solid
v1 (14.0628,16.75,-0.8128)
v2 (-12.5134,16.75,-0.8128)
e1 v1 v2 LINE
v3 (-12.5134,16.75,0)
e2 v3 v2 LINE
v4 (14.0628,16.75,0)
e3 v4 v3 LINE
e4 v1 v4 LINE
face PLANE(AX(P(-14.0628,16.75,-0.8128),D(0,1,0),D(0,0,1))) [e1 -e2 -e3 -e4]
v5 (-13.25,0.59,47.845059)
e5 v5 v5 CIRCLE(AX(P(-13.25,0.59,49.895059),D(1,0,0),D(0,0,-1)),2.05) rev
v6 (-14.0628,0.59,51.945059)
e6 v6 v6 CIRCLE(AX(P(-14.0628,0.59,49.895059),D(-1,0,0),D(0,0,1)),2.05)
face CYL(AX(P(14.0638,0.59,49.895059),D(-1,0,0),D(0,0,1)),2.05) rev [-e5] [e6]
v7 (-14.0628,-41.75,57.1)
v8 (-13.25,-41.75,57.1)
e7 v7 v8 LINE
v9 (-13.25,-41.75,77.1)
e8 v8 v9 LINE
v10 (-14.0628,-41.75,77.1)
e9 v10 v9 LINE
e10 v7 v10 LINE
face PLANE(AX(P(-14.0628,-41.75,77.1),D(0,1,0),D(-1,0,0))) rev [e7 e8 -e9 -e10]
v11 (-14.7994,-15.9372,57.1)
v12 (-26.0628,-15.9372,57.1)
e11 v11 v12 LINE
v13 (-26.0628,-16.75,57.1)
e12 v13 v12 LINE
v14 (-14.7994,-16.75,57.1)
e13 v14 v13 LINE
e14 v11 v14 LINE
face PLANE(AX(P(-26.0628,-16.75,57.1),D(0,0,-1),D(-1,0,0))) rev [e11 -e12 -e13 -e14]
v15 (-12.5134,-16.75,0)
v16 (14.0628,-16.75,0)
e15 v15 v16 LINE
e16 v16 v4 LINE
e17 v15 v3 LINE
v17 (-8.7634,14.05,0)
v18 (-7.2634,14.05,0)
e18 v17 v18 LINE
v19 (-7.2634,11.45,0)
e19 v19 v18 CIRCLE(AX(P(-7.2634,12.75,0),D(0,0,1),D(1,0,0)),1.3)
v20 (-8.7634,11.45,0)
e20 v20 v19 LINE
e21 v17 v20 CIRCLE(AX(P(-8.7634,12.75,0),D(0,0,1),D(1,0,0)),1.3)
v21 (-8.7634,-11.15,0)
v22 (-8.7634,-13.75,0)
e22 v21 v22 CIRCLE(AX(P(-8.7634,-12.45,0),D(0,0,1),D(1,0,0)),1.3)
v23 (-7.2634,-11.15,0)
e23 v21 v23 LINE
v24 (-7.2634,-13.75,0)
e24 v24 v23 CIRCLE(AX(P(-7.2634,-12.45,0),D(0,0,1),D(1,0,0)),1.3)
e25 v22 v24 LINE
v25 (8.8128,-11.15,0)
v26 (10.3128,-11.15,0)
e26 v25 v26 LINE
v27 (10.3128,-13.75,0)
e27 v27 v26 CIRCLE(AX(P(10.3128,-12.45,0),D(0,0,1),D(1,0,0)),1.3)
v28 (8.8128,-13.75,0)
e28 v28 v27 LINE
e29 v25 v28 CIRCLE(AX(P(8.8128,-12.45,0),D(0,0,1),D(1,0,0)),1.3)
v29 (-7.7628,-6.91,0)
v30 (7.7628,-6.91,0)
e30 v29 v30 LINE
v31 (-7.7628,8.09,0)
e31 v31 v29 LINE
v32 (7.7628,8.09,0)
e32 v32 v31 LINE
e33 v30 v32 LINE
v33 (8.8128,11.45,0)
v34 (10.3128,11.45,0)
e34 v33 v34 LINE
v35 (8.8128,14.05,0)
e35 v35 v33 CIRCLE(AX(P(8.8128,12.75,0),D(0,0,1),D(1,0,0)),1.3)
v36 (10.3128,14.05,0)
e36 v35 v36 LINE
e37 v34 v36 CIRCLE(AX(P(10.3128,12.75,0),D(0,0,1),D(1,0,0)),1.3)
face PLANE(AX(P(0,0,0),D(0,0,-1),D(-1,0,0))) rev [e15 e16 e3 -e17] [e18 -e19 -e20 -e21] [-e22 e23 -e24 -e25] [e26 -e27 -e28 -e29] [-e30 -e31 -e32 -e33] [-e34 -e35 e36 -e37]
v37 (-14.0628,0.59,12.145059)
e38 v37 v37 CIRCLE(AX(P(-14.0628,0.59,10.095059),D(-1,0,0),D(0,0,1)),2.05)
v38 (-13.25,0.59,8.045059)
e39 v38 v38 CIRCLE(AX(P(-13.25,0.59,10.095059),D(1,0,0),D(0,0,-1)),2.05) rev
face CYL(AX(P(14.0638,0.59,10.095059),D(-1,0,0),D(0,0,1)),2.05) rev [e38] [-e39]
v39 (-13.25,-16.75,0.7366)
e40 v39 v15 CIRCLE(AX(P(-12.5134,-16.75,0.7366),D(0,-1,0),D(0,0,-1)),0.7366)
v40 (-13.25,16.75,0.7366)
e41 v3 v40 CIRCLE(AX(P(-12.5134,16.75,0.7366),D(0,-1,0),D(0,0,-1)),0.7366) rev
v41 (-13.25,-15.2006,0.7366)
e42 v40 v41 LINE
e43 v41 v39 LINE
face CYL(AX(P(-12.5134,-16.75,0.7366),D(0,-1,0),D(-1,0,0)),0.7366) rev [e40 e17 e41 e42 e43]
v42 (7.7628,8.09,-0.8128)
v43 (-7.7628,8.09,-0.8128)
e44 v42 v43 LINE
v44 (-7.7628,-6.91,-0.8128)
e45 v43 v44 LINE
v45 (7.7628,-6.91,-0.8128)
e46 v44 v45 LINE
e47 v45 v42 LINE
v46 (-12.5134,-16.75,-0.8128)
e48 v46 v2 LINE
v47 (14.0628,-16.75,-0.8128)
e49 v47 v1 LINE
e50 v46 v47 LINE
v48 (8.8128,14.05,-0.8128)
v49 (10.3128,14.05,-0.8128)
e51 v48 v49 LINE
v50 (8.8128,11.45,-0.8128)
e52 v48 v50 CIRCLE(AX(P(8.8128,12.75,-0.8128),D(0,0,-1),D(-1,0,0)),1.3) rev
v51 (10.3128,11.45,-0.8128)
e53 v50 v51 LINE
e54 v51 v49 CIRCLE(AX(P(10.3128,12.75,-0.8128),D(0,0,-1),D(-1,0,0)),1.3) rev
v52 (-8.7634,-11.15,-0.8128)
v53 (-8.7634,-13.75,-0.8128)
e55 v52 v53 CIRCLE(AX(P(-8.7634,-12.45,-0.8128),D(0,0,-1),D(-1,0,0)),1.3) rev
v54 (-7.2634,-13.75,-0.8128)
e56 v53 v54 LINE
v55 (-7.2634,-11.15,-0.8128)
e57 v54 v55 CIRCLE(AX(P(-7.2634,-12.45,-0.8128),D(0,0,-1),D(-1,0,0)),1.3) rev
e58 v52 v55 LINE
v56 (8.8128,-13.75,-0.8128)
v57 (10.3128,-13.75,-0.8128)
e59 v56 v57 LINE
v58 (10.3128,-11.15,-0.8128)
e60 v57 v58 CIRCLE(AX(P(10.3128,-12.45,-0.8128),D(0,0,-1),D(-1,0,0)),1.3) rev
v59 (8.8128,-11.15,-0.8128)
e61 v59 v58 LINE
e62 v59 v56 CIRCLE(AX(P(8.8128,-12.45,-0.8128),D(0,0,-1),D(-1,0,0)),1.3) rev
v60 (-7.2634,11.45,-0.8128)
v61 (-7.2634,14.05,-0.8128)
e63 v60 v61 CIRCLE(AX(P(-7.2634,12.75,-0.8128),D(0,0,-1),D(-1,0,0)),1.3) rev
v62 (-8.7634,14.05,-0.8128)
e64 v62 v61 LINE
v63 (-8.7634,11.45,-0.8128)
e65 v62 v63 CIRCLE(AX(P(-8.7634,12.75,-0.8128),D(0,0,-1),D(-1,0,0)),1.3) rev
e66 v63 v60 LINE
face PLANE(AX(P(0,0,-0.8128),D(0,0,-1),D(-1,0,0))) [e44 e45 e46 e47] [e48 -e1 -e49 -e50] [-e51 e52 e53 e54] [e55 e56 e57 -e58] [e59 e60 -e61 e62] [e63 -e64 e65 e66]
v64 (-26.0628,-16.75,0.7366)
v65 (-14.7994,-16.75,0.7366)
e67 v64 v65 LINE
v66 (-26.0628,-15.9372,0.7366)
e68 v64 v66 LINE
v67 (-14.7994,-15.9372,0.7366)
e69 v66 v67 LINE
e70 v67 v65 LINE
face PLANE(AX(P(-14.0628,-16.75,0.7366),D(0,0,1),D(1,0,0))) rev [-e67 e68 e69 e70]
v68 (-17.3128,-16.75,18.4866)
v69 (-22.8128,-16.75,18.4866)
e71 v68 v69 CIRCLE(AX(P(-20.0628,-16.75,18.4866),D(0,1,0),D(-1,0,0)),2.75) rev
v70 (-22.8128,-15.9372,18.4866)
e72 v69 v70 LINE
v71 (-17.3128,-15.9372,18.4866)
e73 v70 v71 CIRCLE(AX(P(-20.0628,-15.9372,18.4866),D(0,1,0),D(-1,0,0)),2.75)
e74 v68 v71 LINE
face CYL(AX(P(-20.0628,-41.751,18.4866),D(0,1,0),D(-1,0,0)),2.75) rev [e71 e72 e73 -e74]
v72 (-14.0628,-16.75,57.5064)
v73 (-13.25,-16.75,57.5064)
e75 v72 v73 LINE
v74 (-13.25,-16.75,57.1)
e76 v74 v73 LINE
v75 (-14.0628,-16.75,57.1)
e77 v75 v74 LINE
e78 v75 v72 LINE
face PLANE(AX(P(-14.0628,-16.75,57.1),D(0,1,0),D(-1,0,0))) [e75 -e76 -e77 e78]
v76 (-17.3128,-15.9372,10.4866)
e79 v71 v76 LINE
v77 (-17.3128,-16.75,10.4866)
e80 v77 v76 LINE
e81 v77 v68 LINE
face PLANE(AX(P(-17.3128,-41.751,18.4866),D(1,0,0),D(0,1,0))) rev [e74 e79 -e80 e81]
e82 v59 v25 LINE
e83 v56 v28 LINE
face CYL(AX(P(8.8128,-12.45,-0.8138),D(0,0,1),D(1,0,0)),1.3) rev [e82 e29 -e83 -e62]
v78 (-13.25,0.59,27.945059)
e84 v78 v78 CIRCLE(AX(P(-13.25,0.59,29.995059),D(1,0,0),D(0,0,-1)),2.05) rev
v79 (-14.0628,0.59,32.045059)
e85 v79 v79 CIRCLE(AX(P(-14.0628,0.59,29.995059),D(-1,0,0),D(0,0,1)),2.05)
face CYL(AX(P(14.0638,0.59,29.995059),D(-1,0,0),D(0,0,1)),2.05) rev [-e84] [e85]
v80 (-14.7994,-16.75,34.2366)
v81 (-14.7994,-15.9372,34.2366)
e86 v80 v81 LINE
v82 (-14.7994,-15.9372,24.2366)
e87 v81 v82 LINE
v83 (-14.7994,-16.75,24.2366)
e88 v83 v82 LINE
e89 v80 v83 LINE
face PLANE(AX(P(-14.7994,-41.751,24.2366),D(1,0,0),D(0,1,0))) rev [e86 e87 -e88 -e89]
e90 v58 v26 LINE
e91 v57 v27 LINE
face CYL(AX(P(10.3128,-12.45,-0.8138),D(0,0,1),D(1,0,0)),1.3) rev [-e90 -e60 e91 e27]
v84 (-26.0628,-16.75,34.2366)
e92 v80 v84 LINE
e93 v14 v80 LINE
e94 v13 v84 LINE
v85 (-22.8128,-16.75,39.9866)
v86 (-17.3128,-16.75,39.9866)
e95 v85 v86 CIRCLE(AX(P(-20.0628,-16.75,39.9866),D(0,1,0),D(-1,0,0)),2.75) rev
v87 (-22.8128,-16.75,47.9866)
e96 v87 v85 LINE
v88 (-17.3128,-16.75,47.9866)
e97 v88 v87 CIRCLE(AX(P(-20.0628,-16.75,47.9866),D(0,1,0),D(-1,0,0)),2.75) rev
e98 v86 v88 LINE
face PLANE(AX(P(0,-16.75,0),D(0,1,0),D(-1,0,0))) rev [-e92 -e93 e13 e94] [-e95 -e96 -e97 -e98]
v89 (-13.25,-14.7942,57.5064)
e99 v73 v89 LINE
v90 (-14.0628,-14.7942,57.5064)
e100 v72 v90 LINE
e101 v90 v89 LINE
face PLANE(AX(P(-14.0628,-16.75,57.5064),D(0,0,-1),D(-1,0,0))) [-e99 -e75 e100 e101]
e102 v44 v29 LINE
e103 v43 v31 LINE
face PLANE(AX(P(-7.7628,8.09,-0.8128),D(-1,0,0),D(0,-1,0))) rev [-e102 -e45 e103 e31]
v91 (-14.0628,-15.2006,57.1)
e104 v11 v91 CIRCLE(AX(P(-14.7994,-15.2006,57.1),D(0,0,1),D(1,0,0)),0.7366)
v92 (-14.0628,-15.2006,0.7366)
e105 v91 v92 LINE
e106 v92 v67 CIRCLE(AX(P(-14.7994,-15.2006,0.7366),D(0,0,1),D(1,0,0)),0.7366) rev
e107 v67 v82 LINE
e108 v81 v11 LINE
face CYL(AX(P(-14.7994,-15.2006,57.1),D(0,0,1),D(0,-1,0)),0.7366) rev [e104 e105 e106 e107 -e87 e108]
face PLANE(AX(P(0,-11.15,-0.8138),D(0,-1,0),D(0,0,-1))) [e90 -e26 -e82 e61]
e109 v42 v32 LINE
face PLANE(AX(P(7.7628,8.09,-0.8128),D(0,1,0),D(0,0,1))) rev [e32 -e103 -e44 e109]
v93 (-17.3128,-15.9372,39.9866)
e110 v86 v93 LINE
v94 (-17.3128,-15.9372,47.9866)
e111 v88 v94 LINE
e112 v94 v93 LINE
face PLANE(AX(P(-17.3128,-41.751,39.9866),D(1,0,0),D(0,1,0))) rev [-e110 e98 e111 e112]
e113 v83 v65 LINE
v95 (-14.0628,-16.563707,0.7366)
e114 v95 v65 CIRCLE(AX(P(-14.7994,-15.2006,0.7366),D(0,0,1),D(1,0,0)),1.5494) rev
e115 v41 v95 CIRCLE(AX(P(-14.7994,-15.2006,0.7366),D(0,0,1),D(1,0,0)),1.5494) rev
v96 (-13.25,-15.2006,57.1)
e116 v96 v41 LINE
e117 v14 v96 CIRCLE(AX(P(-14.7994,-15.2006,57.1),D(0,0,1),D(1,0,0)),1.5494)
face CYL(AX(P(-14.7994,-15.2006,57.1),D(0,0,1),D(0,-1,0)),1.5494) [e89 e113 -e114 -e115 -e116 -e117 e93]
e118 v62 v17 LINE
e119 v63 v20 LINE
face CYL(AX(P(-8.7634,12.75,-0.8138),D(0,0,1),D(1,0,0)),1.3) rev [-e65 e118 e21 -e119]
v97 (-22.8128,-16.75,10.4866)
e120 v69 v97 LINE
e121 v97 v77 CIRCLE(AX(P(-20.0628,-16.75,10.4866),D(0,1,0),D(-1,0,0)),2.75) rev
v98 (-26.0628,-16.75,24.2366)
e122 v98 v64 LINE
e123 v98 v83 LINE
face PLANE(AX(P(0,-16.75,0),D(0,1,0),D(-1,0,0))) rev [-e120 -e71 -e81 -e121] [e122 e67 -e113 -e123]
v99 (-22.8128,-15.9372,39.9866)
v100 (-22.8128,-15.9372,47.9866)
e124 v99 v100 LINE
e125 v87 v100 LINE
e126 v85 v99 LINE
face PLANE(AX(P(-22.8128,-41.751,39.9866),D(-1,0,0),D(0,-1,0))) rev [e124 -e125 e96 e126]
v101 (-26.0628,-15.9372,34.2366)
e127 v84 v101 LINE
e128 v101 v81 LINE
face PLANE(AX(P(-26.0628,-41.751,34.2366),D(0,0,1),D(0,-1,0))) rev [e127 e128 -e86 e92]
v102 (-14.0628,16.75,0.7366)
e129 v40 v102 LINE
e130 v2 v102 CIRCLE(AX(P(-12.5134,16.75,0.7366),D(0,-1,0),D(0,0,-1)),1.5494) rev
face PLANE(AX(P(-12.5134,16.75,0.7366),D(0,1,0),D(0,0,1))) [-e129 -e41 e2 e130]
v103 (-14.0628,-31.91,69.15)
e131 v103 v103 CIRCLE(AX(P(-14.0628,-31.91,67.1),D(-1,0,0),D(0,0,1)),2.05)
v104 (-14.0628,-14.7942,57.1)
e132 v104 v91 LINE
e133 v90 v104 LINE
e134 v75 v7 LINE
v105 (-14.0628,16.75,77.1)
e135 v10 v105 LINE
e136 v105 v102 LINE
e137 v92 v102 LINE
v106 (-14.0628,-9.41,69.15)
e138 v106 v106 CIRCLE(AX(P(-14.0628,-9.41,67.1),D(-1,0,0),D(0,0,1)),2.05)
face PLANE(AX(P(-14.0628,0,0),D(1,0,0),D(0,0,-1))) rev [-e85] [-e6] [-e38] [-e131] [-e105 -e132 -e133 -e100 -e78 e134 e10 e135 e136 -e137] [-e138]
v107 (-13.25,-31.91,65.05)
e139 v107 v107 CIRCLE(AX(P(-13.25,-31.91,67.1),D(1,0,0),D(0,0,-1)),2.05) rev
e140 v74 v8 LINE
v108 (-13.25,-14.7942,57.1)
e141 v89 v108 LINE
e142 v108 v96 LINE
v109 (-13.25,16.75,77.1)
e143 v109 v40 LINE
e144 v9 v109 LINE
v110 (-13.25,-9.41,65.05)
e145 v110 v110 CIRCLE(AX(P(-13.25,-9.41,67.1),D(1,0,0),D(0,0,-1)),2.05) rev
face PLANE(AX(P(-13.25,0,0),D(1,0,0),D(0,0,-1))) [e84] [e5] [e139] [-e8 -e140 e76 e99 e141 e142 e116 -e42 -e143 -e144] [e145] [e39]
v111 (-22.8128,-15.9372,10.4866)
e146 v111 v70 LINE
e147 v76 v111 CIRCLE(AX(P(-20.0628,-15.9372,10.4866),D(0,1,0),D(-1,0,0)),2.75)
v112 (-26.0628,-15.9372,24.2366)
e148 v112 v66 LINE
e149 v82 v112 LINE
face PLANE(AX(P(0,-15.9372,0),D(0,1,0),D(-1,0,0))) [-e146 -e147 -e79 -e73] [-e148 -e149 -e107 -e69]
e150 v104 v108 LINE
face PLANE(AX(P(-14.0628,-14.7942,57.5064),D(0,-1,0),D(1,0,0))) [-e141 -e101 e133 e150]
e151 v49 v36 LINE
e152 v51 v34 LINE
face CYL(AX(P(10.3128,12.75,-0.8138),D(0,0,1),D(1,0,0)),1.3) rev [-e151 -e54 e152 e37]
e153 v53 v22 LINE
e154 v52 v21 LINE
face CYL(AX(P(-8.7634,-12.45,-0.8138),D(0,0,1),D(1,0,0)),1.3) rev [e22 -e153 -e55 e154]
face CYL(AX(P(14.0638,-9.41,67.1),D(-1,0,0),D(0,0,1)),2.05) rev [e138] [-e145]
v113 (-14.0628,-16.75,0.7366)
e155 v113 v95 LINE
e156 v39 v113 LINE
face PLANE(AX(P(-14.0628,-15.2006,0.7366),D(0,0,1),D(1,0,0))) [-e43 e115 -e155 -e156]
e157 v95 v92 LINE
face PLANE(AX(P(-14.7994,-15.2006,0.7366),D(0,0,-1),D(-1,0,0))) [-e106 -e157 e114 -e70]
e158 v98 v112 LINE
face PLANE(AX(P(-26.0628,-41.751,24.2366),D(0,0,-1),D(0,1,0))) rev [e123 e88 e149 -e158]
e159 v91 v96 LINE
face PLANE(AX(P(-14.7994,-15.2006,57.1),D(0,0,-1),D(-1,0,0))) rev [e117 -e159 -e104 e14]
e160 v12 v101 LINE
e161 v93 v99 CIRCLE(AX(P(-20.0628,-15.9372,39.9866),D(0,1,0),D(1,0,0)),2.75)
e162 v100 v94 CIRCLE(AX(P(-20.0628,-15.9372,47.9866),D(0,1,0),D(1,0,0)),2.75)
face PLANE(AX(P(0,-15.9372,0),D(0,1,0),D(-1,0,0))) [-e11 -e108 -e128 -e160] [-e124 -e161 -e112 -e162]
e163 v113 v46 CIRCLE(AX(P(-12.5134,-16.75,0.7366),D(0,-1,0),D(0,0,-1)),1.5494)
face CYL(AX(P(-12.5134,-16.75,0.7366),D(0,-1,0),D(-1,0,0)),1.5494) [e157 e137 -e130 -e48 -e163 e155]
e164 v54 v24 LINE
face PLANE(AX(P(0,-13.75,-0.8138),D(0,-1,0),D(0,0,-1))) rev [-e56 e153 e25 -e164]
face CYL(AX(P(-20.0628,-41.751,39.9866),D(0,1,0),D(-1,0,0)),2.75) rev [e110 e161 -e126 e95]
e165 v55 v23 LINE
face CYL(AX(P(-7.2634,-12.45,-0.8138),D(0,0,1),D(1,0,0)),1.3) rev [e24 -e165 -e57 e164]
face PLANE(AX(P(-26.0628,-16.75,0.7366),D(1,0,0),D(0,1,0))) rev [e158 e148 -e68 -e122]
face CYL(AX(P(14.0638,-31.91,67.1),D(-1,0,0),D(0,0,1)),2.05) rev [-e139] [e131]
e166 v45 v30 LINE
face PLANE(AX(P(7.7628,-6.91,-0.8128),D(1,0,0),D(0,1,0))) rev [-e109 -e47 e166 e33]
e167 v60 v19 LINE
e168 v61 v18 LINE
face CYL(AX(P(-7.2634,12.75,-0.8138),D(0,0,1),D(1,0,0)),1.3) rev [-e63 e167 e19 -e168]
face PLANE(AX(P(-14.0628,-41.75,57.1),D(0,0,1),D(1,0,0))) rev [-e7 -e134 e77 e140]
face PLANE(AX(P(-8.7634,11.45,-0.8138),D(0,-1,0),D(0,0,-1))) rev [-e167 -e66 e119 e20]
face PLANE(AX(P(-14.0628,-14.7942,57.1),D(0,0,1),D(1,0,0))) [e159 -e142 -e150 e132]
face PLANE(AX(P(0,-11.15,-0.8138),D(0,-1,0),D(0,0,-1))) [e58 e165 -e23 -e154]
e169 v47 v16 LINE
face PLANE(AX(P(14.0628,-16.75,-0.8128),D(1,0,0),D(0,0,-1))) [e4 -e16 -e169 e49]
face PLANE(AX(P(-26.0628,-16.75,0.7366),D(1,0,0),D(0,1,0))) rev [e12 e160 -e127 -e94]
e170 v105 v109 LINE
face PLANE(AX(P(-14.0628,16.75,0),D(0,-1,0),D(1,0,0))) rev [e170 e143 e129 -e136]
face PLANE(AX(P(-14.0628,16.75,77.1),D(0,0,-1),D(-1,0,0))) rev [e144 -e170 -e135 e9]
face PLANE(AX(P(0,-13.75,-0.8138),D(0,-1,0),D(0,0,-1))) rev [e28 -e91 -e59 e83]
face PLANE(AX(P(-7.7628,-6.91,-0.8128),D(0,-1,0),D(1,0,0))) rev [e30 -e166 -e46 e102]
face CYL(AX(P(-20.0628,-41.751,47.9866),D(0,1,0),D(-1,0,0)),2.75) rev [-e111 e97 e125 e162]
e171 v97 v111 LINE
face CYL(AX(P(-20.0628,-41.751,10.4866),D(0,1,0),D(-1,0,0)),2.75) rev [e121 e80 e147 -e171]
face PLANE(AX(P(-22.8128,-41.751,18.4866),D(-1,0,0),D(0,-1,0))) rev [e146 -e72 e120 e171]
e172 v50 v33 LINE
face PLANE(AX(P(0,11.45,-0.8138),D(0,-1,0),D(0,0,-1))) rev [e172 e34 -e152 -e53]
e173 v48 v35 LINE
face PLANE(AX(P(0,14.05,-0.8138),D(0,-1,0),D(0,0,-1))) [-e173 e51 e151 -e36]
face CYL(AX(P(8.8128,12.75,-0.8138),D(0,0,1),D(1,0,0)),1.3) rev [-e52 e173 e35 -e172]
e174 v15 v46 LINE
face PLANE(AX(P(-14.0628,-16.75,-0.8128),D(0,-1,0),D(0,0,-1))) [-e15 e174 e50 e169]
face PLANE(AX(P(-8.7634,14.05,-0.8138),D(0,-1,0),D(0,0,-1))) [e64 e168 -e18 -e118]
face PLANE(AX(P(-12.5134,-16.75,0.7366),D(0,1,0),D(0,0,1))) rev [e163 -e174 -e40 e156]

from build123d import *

# Parameters (mm, degrees)
SKETCH1_W                    = 28.1256
SKETCH1_H                    = 33.5
SKETCH1_W_2                  = 15.5256
SKETCH1_H_2                  = 15
BASE_FLANGE2_DEPTH           = 0.8128
EDGE_FLANGE3_STRIP_W         = 4.7244
EDGE_FLANGE3_STRIP_H         = 0.8128
EDGE_FLANGE3_STRIP_CUT_DEPTH = 33.5
EDGE_FLANGE3_DEPTH           = 33.5
EDGE_FLANGE3_FLAT_DEPTH      = 0.8128
EDGE_FLANGE4_START           = 0.7366
EDGE_FLANGE4_DEPTH           = 56.7698
EDGE_FLANGE4_START_2         = 57.1
EDGE_FLANGE4_2_DEPTH         = 0.4064
EDGE_FLANGE4_3_DEPTH         = 56.3634
CUT_EXTRUDE1_REACH           = 94.079
SKETCH22_R                   = 2.05
CUT_EXTRUDE2_REACH           = 89.705
SKETCH23_W                   = 11.2634
SKETCH23_H                   = 10
CUT_EXTRUDE3_REACH           = 93.47


# Read off the part's stored shape, not the designer's step: Edge-Flange4
# Sheet-metal steps are written as plain solids
with BuildPart() as part:
    # Sketch1 → Base-Flange2 (new body)
    with BuildSketch(Plane.XY):
        Rectangle(SKETCH1_W, SKETCH1_H)
        with Locations((0, 0.59)):
            Rectangle(SKETCH1_W_2, SKETCH1_H_2, mode=Mode.SUBTRACT)
    extrude(amount=-BASE_FLANGE2_DEPTH)

    # Edge-Flange3 strip (across the edge) → Edge-Flange3 strip cut (cut)
    with BuildSketch(Plane(origin=(-14.0628, 16.75, 0), x_dir=(1, 0, 0), z_dir=(0, -1, 0))):
        with Locations((-0.8128, -0.4064)):
            Rectangle(EDGE_FLANGE3_STRIP_W, EDGE_FLANGE3_STRIP_H)
    extrude(amount=EDGE_FLANGE3_STRIP_CUT_DEPTH, mode=Mode.SUBTRACT)

    # Edge-Flange3 bend section (across the edge) → Edge-Flange3 (add)
    with BuildSketch(Plane(origin=(-14.0628, 16.75, 0), x_dir=(1, 0, 0), z_dir=(0, -1, 0))):
        with BuildLine():
            Line((0, 0.7366), (0.8128, 0.7366))
            ThreePointArc((0.8128, 0.7366), (1.028545145, 0.215745145), (1.5494, 0))
            Line((1.5494, 0), (1.5494, -0.8128))
            ThreePointArc((1.5494, -0.8128), (0.453808753, -0.358991247), (0, 0.7366))
        make_face()
    extrude(amount=EDGE_FLANGE3_DEPTH)

    # Edge-Flange3 profile (on flange) → Edge-Flange3 flat (add)
    with BuildSketch(Plane(origin=(-14.0628, 0, 0), x_dir=(0, -1, 0), z_dir=(-1, 0, 0))):
        Polygon((-16.75, 0.7366), (16.75, 0.7366), (16.75, 57.1), (41.75, 57.1), (41.75, 77.1), (-16.75, 77.1), align=None)
    extrude(amount=-EDGE_FLANGE3_FLAT_DEPTH)

    # Edge-Flange4 outline → Edge-Flange4 (cut)
    with BuildSketch(Plane.XY.offset(EDGE_FLANGE4_START)):
        with BuildLine():
            ThreePointArc((-13.25, -15.2006), (-13.468624211, -15.994121367), (-14.0628, -16.563707039))
            Line((-14.0628, -16.563707039), (-14.0628, -16.75))
            Line((-14.0628, -16.75), (-13.25, -16.75))
            Line((-13.25, -16.75), (-13.25, -15.2006))
        make_face()
    extrude(amount=EDGE_FLANGE4_DEPTH, mode=Mode.SUBTRACT)

    # Edge-Flange4 2 outline → Edge-Flange4 2 (cut)
    with BuildSketch(Plane.XY.offset(EDGE_FLANGE4_START_2)):
        with BuildLine():
            Line((-14.0628, -14.7942), (-14.0628, -16.563707039))
            ThreePointArc((-14.0628, -16.563707039), (-13.468624211, -15.994121367), (-13.25, -15.2006))
            Line((-13.25, -15.2006), (-13.25, -14.7942))
            Line((-13.25, -14.7942), (-14.0628, -14.7942))
        make_face()
    extrude(amount=EDGE_FLANGE4_2_DEPTH, mode=Mode.SUBTRACT)

    # Edge-Flange4 3 outline → Edge-Flange4 3 (add)
    with BuildSketch(Plane.XY.offset(EDGE_FLANGE4_START)):
        with BuildLine():
            Line((-26.0628, -16.75), (-14.7994, -16.75))
            ThreePointArc((-14.7994, -16.75), (-14.419503755, -16.702704924), (-14.0628, -16.563707039))
            Line((-14.0628, -16.563707039), (-14.0628, -15.2006))
            ThreePointArc((-14.0628, -15.2006), (-14.278545145, -15.721454855), (-14.7994, -15.9372))
            Line((-14.7994, -15.9372), (-26.0628, -15.9372))
            Line((-26.0628, -15.9372), (-26.0628, -16.75))
        make_face()
    extrude(amount=EDGE_FLANGE4_3_DEPTH)

    # Sketch22 → Cut-Extrude1 (cut, up to next)
    with BuildSketch(Plane.ZY.offset(14.0628), mode=Mode.PRIVATE) as cut_extrude1_sk1:
        with Locations((67.1, -31.91)):
            Circle(SKETCH22_R)
    cut_extrude1_tool1 = extrude(cut_extrude1_sk1.sketch, amount=-CUT_EXTRUDE1_REACH, mode=Mode.PRIVATE) & part.part
    # Sketch22 → Cut-Extrude1 (cut, up to next)
    with BuildSketch(Plane.ZY.offset(14.0628), mode=Mode.PRIVATE) as cut_extrude1_sk2:
        with Locations((67.1, -9.41)):
            Circle(SKETCH22_R)
    cut_extrude1_tool2 = extrude(cut_extrude1_sk2.sketch, amount=-CUT_EXTRUDE1_REACH, mode=Mode.PRIVATE) & part.part
    # Sketch22 → Cut-Extrude1 (cut, up to next)
    with BuildSketch(Plane.ZY.offset(14.0628), mode=Mode.PRIVATE) as cut_extrude1_sk3:
        with Locations((49.895058849, 0.59)):
            Circle(SKETCH22_R)
    cut_extrude1_tool3 = extrude(cut_extrude1_sk3.sketch, amount=-CUT_EXTRUDE1_REACH, mode=Mode.PRIVATE) & part.part
    # Sketch22 → Cut-Extrude1 (cut, up to next)
    with BuildSketch(Plane.ZY.offset(14.0628), mode=Mode.PRIVATE) as cut_extrude1_sk4:
        with Locations((29.995058849, 0.59)):
            Circle(SKETCH22_R)
    cut_extrude1_tool4 = extrude(cut_extrude1_sk4.sketch, amount=-CUT_EXTRUDE1_REACH, mode=Mode.PRIVATE) & part.part
    # Sketch22 → Cut-Extrude1 (cut, up to next)
    with BuildSketch(Plane.ZY.offset(14.0628), mode=Mode.PRIVATE) as cut_extrude1_sk5:
        with Locations((10.095058849, 0.59)):
            Circle(SKETCH22_R)
    cut_extrude1_tool5 = extrude(cut_extrude1_sk5.sketch, amount=-CUT_EXTRUDE1_REACH, mode=Mode.PRIVATE) & part.part
    add(cut_extrude1_tool1.solids().sort_by_distance((-14.0628, -31.91, 67.1))[0], mode=Mode.SUBTRACT)
    add(cut_extrude1_tool2.solids().sort_by_distance((-14.0628, -9.41, 67.1))[0], mode=Mode.SUBTRACT)
    add(cut_extrude1_tool3.solids().sort_by_distance((-14.0628, 0.59, 49.895059))[0], mode=Mode.SUBTRACT)
    add(cut_extrude1_tool4.solids().sort_by_distance((-14.0628, 0.59, 29.995059))[0], mode=Mode.SUBTRACT)
    add(cut_extrude1_tool5.solids().sort_by_distance((-14.0628, 0.59, 10.095059))[0], mode=Mode.SUBTRACT)

    # Sketch23 → Cut-Extrude2 (cut, up to next)
    with BuildSketch(Plane(origin=(0, -15.9372, 0), x_dir=(1, 0, 0), z_dir=(0, 1, 0)), mode=Mode.PRIVATE) as cut_extrude2_sk1:
        with Locations((-20.4311, -29.2366)):
            Rectangle(SKETCH23_W, SKETCH23_H)
    cut_extrude2_tool1 = extrude(cut_extrude2_sk1.sketch, amount=-CUT_EXTRUDE2_REACH, mode=Mode.PRIVATE) & part.part
    # Sketch23 → Cut-Extrude2 (cut, up to next)
    with BuildSketch(Plane(origin=(0, -15.9372, 0), x_dir=(1, 0, 0), z_dir=(0, 1, 0)), mode=Mode.PRIVATE) as cut_extrude2_sk2:
        with BuildLine():
            Line((-22.8128, -18.4866), (-22.8128, -10.4866))
            ThreePointArc((-22.8128, -10.4866), (-20.0628, -7.7366), (-17.3128, -10.4866))
            Line((-17.3128, -10.4866), (-17.3128, -18.4866))
            ThreePointArc((-17.3128, -18.4866), (-20.0628, -21.2366), (-22.8128, -18.4866))
        make_face()
    cut_extrude2_tool2 = extrude(cut_extrude2_sk2.sketch, amount=-CUT_EXTRUDE2_REACH, mode=Mode.PRIVATE) & part.part
    # Sketch23 → Cut-Extrude2 (cut, up to next)
    with BuildSketch(Plane(origin=(0, -15.9372, 0), x_dir=(1, 0, 0), z_dir=(0, 1, 0)), mode=Mode.PRIVATE) as cut_extrude2_sk3:
        with BuildLine():
            Line((-22.8128, -39.9866), (-22.8128, -47.9866))
            ThreePointArc((-22.8128, -47.9866), (-20.0628, -50.7366), (-17.3128, -47.9866))
            Line((-17.3128, -47.9866), (-17.3128, -39.9866))
            ThreePointArc((-17.3128, -39.9866), (-20.0628, -37.2366), (-22.8128, -39.9866))
        make_face()
    cut_extrude2_tool3 = extrude(cut_extrude2_sk3.sketch, amount=-CUT_EXTRUDE2_REACH, mode=Mode.PRIVATE) & part.part
    add(cut_extrude2_tool1.solids().sort_by_distance((-20.4311, -15.9372, 29.2366))[0], mode=Mode.SUBTRACT)
    add(cut_extrude2_tool2.solids().sort_by_distance((-20.0628, -15.9372, 14.4866))[0], mode=Mode.SUBTRACT)
    add(cut_extrude2_tool3.solids().sort_by_distance((-20.0628, -15.9372, 43.9866))[0], mode=Mode.SUBTRACT)

    # Sketch26 → Cut-Extrude3 (cut, up to next)
    with BuildSketch(Plane.XY, mode=Mode.PRIVATE) as cut_extrude3_sk1:
        with BuildLine():
            Line((8.8128, -13.75), (10.3128, -13.75))
            ThreePointArc((10.3128, -13.75), (11.6128, -12.45), (10.3128, -11.15))
            Line((10.3128, -11.15), (8.8128, -11.15))
            ThreePointArc((8.8128, -11.15), (7.5128, -12.45), (8.8128, -13.75))
        make_face()
    cut_extrude3_tool1 = extrude(cut_extrude3_sk1.sketch, amount=-CUT_EXTRUDE3_REACH, mode=Mode.PRIVATE) & part.part
    # Sketch26 → Cut-Extrude3 (cut, up to next)
    with BuildSketch(Plane.XY, mode=Mode.PRIVATE) as cut_extrude3_sk2:
        with BuildLine():
            Line((-8.7634, -13.75), (-7.2634, -13.75))
            ThreePointArc((-7.2634, -13.75), (-5.9634, -12.45), (-7.2634, -11.15))
            Line((-7.2634, -11.15), (-8.7634, -11.15))
            ThreePointArc((-8.7634, -11.15), (-10.0634, -12.45), (-8.7634, -13.75))
        make_face()
    cut_extrude3_tool2 = extrude(cut_extrude3_sk2.sketch, amount=-CUT_EXTRUDE3_REACH, mode=Mode.PRIVATE) & part.part
    # Sketch26 → Cut-Extrude3 (cut, up to next)
    with BuildSketch(Plane.XY, mode=Mode.PRIVATE) as cut_extrude3_sk3:
        with BuildLine():
            Line((8.8128, 11.45), (10.3128, 11.45))
            ThreePointArc((10.3128, 11.45), (11.6128, 12.75), (10.3128, 14.05))
            Line((10.3128, 14.05), (8.8128, 14.05))
            ThreePointArc((8.8128, 14.05), (7.5128, 12.75), (8.8128, 11.45))
        make_face()
    cut_extrude3_tool3 = extrude(cut_extrude3_sk3.sketch, amount=-CUT_EXTRUDE3_REACH, mode=Mode.PRIVATE) & part.part
    # Sketch26 → Cut-Extrude3 (cut, up to next)
    with BuildSketch(Plane.XY, mode=Mode.PRIVATE) as cut_extrude3_sk4:
        with BuildLine():
            Line((-8.7634, 11.45), (-7.2634, 11.45))
            ThreePointArc((-7.2634, 11.45), (-5.9634, 12.75), (-7.2634, 14.05))
            Line((-7.2634, 14.05), (-8.7634, 14.05))
            ThreePointArc((-8.7634, 14.05), (-10.0634, 12.75), (-8.7634, 11.45))
        make_face()
    cut_extrude3_tool4 = extrude(cut_extrude3_sk4.sketch, amount=-CUT_EXTRUDE3_REACH, mode=Mode.PRIVATE) & part.part
    add(cut_extrude3_tool1.solids().sort_by_distance((9.5628, -12.45, 0))[0], mode=Mode.SUBTRACT)
    add(cut_extrude3_tool2.solids().sort_by_distance((-8.0134, -12.45, 0))[0], mode=Mode.SUBTRACT)
    add(cut_extrude3_tool3.solids().sort_by_distance((9.5628, 12.75, 0))[0], mode=Mode.SUBTRACT)
    add(cut_extrude3_tool4.solids().sort_by_distance((-8.0134, 12.75, 0))[0], mode=Mode.SUBTRACT)


solid = part.part
